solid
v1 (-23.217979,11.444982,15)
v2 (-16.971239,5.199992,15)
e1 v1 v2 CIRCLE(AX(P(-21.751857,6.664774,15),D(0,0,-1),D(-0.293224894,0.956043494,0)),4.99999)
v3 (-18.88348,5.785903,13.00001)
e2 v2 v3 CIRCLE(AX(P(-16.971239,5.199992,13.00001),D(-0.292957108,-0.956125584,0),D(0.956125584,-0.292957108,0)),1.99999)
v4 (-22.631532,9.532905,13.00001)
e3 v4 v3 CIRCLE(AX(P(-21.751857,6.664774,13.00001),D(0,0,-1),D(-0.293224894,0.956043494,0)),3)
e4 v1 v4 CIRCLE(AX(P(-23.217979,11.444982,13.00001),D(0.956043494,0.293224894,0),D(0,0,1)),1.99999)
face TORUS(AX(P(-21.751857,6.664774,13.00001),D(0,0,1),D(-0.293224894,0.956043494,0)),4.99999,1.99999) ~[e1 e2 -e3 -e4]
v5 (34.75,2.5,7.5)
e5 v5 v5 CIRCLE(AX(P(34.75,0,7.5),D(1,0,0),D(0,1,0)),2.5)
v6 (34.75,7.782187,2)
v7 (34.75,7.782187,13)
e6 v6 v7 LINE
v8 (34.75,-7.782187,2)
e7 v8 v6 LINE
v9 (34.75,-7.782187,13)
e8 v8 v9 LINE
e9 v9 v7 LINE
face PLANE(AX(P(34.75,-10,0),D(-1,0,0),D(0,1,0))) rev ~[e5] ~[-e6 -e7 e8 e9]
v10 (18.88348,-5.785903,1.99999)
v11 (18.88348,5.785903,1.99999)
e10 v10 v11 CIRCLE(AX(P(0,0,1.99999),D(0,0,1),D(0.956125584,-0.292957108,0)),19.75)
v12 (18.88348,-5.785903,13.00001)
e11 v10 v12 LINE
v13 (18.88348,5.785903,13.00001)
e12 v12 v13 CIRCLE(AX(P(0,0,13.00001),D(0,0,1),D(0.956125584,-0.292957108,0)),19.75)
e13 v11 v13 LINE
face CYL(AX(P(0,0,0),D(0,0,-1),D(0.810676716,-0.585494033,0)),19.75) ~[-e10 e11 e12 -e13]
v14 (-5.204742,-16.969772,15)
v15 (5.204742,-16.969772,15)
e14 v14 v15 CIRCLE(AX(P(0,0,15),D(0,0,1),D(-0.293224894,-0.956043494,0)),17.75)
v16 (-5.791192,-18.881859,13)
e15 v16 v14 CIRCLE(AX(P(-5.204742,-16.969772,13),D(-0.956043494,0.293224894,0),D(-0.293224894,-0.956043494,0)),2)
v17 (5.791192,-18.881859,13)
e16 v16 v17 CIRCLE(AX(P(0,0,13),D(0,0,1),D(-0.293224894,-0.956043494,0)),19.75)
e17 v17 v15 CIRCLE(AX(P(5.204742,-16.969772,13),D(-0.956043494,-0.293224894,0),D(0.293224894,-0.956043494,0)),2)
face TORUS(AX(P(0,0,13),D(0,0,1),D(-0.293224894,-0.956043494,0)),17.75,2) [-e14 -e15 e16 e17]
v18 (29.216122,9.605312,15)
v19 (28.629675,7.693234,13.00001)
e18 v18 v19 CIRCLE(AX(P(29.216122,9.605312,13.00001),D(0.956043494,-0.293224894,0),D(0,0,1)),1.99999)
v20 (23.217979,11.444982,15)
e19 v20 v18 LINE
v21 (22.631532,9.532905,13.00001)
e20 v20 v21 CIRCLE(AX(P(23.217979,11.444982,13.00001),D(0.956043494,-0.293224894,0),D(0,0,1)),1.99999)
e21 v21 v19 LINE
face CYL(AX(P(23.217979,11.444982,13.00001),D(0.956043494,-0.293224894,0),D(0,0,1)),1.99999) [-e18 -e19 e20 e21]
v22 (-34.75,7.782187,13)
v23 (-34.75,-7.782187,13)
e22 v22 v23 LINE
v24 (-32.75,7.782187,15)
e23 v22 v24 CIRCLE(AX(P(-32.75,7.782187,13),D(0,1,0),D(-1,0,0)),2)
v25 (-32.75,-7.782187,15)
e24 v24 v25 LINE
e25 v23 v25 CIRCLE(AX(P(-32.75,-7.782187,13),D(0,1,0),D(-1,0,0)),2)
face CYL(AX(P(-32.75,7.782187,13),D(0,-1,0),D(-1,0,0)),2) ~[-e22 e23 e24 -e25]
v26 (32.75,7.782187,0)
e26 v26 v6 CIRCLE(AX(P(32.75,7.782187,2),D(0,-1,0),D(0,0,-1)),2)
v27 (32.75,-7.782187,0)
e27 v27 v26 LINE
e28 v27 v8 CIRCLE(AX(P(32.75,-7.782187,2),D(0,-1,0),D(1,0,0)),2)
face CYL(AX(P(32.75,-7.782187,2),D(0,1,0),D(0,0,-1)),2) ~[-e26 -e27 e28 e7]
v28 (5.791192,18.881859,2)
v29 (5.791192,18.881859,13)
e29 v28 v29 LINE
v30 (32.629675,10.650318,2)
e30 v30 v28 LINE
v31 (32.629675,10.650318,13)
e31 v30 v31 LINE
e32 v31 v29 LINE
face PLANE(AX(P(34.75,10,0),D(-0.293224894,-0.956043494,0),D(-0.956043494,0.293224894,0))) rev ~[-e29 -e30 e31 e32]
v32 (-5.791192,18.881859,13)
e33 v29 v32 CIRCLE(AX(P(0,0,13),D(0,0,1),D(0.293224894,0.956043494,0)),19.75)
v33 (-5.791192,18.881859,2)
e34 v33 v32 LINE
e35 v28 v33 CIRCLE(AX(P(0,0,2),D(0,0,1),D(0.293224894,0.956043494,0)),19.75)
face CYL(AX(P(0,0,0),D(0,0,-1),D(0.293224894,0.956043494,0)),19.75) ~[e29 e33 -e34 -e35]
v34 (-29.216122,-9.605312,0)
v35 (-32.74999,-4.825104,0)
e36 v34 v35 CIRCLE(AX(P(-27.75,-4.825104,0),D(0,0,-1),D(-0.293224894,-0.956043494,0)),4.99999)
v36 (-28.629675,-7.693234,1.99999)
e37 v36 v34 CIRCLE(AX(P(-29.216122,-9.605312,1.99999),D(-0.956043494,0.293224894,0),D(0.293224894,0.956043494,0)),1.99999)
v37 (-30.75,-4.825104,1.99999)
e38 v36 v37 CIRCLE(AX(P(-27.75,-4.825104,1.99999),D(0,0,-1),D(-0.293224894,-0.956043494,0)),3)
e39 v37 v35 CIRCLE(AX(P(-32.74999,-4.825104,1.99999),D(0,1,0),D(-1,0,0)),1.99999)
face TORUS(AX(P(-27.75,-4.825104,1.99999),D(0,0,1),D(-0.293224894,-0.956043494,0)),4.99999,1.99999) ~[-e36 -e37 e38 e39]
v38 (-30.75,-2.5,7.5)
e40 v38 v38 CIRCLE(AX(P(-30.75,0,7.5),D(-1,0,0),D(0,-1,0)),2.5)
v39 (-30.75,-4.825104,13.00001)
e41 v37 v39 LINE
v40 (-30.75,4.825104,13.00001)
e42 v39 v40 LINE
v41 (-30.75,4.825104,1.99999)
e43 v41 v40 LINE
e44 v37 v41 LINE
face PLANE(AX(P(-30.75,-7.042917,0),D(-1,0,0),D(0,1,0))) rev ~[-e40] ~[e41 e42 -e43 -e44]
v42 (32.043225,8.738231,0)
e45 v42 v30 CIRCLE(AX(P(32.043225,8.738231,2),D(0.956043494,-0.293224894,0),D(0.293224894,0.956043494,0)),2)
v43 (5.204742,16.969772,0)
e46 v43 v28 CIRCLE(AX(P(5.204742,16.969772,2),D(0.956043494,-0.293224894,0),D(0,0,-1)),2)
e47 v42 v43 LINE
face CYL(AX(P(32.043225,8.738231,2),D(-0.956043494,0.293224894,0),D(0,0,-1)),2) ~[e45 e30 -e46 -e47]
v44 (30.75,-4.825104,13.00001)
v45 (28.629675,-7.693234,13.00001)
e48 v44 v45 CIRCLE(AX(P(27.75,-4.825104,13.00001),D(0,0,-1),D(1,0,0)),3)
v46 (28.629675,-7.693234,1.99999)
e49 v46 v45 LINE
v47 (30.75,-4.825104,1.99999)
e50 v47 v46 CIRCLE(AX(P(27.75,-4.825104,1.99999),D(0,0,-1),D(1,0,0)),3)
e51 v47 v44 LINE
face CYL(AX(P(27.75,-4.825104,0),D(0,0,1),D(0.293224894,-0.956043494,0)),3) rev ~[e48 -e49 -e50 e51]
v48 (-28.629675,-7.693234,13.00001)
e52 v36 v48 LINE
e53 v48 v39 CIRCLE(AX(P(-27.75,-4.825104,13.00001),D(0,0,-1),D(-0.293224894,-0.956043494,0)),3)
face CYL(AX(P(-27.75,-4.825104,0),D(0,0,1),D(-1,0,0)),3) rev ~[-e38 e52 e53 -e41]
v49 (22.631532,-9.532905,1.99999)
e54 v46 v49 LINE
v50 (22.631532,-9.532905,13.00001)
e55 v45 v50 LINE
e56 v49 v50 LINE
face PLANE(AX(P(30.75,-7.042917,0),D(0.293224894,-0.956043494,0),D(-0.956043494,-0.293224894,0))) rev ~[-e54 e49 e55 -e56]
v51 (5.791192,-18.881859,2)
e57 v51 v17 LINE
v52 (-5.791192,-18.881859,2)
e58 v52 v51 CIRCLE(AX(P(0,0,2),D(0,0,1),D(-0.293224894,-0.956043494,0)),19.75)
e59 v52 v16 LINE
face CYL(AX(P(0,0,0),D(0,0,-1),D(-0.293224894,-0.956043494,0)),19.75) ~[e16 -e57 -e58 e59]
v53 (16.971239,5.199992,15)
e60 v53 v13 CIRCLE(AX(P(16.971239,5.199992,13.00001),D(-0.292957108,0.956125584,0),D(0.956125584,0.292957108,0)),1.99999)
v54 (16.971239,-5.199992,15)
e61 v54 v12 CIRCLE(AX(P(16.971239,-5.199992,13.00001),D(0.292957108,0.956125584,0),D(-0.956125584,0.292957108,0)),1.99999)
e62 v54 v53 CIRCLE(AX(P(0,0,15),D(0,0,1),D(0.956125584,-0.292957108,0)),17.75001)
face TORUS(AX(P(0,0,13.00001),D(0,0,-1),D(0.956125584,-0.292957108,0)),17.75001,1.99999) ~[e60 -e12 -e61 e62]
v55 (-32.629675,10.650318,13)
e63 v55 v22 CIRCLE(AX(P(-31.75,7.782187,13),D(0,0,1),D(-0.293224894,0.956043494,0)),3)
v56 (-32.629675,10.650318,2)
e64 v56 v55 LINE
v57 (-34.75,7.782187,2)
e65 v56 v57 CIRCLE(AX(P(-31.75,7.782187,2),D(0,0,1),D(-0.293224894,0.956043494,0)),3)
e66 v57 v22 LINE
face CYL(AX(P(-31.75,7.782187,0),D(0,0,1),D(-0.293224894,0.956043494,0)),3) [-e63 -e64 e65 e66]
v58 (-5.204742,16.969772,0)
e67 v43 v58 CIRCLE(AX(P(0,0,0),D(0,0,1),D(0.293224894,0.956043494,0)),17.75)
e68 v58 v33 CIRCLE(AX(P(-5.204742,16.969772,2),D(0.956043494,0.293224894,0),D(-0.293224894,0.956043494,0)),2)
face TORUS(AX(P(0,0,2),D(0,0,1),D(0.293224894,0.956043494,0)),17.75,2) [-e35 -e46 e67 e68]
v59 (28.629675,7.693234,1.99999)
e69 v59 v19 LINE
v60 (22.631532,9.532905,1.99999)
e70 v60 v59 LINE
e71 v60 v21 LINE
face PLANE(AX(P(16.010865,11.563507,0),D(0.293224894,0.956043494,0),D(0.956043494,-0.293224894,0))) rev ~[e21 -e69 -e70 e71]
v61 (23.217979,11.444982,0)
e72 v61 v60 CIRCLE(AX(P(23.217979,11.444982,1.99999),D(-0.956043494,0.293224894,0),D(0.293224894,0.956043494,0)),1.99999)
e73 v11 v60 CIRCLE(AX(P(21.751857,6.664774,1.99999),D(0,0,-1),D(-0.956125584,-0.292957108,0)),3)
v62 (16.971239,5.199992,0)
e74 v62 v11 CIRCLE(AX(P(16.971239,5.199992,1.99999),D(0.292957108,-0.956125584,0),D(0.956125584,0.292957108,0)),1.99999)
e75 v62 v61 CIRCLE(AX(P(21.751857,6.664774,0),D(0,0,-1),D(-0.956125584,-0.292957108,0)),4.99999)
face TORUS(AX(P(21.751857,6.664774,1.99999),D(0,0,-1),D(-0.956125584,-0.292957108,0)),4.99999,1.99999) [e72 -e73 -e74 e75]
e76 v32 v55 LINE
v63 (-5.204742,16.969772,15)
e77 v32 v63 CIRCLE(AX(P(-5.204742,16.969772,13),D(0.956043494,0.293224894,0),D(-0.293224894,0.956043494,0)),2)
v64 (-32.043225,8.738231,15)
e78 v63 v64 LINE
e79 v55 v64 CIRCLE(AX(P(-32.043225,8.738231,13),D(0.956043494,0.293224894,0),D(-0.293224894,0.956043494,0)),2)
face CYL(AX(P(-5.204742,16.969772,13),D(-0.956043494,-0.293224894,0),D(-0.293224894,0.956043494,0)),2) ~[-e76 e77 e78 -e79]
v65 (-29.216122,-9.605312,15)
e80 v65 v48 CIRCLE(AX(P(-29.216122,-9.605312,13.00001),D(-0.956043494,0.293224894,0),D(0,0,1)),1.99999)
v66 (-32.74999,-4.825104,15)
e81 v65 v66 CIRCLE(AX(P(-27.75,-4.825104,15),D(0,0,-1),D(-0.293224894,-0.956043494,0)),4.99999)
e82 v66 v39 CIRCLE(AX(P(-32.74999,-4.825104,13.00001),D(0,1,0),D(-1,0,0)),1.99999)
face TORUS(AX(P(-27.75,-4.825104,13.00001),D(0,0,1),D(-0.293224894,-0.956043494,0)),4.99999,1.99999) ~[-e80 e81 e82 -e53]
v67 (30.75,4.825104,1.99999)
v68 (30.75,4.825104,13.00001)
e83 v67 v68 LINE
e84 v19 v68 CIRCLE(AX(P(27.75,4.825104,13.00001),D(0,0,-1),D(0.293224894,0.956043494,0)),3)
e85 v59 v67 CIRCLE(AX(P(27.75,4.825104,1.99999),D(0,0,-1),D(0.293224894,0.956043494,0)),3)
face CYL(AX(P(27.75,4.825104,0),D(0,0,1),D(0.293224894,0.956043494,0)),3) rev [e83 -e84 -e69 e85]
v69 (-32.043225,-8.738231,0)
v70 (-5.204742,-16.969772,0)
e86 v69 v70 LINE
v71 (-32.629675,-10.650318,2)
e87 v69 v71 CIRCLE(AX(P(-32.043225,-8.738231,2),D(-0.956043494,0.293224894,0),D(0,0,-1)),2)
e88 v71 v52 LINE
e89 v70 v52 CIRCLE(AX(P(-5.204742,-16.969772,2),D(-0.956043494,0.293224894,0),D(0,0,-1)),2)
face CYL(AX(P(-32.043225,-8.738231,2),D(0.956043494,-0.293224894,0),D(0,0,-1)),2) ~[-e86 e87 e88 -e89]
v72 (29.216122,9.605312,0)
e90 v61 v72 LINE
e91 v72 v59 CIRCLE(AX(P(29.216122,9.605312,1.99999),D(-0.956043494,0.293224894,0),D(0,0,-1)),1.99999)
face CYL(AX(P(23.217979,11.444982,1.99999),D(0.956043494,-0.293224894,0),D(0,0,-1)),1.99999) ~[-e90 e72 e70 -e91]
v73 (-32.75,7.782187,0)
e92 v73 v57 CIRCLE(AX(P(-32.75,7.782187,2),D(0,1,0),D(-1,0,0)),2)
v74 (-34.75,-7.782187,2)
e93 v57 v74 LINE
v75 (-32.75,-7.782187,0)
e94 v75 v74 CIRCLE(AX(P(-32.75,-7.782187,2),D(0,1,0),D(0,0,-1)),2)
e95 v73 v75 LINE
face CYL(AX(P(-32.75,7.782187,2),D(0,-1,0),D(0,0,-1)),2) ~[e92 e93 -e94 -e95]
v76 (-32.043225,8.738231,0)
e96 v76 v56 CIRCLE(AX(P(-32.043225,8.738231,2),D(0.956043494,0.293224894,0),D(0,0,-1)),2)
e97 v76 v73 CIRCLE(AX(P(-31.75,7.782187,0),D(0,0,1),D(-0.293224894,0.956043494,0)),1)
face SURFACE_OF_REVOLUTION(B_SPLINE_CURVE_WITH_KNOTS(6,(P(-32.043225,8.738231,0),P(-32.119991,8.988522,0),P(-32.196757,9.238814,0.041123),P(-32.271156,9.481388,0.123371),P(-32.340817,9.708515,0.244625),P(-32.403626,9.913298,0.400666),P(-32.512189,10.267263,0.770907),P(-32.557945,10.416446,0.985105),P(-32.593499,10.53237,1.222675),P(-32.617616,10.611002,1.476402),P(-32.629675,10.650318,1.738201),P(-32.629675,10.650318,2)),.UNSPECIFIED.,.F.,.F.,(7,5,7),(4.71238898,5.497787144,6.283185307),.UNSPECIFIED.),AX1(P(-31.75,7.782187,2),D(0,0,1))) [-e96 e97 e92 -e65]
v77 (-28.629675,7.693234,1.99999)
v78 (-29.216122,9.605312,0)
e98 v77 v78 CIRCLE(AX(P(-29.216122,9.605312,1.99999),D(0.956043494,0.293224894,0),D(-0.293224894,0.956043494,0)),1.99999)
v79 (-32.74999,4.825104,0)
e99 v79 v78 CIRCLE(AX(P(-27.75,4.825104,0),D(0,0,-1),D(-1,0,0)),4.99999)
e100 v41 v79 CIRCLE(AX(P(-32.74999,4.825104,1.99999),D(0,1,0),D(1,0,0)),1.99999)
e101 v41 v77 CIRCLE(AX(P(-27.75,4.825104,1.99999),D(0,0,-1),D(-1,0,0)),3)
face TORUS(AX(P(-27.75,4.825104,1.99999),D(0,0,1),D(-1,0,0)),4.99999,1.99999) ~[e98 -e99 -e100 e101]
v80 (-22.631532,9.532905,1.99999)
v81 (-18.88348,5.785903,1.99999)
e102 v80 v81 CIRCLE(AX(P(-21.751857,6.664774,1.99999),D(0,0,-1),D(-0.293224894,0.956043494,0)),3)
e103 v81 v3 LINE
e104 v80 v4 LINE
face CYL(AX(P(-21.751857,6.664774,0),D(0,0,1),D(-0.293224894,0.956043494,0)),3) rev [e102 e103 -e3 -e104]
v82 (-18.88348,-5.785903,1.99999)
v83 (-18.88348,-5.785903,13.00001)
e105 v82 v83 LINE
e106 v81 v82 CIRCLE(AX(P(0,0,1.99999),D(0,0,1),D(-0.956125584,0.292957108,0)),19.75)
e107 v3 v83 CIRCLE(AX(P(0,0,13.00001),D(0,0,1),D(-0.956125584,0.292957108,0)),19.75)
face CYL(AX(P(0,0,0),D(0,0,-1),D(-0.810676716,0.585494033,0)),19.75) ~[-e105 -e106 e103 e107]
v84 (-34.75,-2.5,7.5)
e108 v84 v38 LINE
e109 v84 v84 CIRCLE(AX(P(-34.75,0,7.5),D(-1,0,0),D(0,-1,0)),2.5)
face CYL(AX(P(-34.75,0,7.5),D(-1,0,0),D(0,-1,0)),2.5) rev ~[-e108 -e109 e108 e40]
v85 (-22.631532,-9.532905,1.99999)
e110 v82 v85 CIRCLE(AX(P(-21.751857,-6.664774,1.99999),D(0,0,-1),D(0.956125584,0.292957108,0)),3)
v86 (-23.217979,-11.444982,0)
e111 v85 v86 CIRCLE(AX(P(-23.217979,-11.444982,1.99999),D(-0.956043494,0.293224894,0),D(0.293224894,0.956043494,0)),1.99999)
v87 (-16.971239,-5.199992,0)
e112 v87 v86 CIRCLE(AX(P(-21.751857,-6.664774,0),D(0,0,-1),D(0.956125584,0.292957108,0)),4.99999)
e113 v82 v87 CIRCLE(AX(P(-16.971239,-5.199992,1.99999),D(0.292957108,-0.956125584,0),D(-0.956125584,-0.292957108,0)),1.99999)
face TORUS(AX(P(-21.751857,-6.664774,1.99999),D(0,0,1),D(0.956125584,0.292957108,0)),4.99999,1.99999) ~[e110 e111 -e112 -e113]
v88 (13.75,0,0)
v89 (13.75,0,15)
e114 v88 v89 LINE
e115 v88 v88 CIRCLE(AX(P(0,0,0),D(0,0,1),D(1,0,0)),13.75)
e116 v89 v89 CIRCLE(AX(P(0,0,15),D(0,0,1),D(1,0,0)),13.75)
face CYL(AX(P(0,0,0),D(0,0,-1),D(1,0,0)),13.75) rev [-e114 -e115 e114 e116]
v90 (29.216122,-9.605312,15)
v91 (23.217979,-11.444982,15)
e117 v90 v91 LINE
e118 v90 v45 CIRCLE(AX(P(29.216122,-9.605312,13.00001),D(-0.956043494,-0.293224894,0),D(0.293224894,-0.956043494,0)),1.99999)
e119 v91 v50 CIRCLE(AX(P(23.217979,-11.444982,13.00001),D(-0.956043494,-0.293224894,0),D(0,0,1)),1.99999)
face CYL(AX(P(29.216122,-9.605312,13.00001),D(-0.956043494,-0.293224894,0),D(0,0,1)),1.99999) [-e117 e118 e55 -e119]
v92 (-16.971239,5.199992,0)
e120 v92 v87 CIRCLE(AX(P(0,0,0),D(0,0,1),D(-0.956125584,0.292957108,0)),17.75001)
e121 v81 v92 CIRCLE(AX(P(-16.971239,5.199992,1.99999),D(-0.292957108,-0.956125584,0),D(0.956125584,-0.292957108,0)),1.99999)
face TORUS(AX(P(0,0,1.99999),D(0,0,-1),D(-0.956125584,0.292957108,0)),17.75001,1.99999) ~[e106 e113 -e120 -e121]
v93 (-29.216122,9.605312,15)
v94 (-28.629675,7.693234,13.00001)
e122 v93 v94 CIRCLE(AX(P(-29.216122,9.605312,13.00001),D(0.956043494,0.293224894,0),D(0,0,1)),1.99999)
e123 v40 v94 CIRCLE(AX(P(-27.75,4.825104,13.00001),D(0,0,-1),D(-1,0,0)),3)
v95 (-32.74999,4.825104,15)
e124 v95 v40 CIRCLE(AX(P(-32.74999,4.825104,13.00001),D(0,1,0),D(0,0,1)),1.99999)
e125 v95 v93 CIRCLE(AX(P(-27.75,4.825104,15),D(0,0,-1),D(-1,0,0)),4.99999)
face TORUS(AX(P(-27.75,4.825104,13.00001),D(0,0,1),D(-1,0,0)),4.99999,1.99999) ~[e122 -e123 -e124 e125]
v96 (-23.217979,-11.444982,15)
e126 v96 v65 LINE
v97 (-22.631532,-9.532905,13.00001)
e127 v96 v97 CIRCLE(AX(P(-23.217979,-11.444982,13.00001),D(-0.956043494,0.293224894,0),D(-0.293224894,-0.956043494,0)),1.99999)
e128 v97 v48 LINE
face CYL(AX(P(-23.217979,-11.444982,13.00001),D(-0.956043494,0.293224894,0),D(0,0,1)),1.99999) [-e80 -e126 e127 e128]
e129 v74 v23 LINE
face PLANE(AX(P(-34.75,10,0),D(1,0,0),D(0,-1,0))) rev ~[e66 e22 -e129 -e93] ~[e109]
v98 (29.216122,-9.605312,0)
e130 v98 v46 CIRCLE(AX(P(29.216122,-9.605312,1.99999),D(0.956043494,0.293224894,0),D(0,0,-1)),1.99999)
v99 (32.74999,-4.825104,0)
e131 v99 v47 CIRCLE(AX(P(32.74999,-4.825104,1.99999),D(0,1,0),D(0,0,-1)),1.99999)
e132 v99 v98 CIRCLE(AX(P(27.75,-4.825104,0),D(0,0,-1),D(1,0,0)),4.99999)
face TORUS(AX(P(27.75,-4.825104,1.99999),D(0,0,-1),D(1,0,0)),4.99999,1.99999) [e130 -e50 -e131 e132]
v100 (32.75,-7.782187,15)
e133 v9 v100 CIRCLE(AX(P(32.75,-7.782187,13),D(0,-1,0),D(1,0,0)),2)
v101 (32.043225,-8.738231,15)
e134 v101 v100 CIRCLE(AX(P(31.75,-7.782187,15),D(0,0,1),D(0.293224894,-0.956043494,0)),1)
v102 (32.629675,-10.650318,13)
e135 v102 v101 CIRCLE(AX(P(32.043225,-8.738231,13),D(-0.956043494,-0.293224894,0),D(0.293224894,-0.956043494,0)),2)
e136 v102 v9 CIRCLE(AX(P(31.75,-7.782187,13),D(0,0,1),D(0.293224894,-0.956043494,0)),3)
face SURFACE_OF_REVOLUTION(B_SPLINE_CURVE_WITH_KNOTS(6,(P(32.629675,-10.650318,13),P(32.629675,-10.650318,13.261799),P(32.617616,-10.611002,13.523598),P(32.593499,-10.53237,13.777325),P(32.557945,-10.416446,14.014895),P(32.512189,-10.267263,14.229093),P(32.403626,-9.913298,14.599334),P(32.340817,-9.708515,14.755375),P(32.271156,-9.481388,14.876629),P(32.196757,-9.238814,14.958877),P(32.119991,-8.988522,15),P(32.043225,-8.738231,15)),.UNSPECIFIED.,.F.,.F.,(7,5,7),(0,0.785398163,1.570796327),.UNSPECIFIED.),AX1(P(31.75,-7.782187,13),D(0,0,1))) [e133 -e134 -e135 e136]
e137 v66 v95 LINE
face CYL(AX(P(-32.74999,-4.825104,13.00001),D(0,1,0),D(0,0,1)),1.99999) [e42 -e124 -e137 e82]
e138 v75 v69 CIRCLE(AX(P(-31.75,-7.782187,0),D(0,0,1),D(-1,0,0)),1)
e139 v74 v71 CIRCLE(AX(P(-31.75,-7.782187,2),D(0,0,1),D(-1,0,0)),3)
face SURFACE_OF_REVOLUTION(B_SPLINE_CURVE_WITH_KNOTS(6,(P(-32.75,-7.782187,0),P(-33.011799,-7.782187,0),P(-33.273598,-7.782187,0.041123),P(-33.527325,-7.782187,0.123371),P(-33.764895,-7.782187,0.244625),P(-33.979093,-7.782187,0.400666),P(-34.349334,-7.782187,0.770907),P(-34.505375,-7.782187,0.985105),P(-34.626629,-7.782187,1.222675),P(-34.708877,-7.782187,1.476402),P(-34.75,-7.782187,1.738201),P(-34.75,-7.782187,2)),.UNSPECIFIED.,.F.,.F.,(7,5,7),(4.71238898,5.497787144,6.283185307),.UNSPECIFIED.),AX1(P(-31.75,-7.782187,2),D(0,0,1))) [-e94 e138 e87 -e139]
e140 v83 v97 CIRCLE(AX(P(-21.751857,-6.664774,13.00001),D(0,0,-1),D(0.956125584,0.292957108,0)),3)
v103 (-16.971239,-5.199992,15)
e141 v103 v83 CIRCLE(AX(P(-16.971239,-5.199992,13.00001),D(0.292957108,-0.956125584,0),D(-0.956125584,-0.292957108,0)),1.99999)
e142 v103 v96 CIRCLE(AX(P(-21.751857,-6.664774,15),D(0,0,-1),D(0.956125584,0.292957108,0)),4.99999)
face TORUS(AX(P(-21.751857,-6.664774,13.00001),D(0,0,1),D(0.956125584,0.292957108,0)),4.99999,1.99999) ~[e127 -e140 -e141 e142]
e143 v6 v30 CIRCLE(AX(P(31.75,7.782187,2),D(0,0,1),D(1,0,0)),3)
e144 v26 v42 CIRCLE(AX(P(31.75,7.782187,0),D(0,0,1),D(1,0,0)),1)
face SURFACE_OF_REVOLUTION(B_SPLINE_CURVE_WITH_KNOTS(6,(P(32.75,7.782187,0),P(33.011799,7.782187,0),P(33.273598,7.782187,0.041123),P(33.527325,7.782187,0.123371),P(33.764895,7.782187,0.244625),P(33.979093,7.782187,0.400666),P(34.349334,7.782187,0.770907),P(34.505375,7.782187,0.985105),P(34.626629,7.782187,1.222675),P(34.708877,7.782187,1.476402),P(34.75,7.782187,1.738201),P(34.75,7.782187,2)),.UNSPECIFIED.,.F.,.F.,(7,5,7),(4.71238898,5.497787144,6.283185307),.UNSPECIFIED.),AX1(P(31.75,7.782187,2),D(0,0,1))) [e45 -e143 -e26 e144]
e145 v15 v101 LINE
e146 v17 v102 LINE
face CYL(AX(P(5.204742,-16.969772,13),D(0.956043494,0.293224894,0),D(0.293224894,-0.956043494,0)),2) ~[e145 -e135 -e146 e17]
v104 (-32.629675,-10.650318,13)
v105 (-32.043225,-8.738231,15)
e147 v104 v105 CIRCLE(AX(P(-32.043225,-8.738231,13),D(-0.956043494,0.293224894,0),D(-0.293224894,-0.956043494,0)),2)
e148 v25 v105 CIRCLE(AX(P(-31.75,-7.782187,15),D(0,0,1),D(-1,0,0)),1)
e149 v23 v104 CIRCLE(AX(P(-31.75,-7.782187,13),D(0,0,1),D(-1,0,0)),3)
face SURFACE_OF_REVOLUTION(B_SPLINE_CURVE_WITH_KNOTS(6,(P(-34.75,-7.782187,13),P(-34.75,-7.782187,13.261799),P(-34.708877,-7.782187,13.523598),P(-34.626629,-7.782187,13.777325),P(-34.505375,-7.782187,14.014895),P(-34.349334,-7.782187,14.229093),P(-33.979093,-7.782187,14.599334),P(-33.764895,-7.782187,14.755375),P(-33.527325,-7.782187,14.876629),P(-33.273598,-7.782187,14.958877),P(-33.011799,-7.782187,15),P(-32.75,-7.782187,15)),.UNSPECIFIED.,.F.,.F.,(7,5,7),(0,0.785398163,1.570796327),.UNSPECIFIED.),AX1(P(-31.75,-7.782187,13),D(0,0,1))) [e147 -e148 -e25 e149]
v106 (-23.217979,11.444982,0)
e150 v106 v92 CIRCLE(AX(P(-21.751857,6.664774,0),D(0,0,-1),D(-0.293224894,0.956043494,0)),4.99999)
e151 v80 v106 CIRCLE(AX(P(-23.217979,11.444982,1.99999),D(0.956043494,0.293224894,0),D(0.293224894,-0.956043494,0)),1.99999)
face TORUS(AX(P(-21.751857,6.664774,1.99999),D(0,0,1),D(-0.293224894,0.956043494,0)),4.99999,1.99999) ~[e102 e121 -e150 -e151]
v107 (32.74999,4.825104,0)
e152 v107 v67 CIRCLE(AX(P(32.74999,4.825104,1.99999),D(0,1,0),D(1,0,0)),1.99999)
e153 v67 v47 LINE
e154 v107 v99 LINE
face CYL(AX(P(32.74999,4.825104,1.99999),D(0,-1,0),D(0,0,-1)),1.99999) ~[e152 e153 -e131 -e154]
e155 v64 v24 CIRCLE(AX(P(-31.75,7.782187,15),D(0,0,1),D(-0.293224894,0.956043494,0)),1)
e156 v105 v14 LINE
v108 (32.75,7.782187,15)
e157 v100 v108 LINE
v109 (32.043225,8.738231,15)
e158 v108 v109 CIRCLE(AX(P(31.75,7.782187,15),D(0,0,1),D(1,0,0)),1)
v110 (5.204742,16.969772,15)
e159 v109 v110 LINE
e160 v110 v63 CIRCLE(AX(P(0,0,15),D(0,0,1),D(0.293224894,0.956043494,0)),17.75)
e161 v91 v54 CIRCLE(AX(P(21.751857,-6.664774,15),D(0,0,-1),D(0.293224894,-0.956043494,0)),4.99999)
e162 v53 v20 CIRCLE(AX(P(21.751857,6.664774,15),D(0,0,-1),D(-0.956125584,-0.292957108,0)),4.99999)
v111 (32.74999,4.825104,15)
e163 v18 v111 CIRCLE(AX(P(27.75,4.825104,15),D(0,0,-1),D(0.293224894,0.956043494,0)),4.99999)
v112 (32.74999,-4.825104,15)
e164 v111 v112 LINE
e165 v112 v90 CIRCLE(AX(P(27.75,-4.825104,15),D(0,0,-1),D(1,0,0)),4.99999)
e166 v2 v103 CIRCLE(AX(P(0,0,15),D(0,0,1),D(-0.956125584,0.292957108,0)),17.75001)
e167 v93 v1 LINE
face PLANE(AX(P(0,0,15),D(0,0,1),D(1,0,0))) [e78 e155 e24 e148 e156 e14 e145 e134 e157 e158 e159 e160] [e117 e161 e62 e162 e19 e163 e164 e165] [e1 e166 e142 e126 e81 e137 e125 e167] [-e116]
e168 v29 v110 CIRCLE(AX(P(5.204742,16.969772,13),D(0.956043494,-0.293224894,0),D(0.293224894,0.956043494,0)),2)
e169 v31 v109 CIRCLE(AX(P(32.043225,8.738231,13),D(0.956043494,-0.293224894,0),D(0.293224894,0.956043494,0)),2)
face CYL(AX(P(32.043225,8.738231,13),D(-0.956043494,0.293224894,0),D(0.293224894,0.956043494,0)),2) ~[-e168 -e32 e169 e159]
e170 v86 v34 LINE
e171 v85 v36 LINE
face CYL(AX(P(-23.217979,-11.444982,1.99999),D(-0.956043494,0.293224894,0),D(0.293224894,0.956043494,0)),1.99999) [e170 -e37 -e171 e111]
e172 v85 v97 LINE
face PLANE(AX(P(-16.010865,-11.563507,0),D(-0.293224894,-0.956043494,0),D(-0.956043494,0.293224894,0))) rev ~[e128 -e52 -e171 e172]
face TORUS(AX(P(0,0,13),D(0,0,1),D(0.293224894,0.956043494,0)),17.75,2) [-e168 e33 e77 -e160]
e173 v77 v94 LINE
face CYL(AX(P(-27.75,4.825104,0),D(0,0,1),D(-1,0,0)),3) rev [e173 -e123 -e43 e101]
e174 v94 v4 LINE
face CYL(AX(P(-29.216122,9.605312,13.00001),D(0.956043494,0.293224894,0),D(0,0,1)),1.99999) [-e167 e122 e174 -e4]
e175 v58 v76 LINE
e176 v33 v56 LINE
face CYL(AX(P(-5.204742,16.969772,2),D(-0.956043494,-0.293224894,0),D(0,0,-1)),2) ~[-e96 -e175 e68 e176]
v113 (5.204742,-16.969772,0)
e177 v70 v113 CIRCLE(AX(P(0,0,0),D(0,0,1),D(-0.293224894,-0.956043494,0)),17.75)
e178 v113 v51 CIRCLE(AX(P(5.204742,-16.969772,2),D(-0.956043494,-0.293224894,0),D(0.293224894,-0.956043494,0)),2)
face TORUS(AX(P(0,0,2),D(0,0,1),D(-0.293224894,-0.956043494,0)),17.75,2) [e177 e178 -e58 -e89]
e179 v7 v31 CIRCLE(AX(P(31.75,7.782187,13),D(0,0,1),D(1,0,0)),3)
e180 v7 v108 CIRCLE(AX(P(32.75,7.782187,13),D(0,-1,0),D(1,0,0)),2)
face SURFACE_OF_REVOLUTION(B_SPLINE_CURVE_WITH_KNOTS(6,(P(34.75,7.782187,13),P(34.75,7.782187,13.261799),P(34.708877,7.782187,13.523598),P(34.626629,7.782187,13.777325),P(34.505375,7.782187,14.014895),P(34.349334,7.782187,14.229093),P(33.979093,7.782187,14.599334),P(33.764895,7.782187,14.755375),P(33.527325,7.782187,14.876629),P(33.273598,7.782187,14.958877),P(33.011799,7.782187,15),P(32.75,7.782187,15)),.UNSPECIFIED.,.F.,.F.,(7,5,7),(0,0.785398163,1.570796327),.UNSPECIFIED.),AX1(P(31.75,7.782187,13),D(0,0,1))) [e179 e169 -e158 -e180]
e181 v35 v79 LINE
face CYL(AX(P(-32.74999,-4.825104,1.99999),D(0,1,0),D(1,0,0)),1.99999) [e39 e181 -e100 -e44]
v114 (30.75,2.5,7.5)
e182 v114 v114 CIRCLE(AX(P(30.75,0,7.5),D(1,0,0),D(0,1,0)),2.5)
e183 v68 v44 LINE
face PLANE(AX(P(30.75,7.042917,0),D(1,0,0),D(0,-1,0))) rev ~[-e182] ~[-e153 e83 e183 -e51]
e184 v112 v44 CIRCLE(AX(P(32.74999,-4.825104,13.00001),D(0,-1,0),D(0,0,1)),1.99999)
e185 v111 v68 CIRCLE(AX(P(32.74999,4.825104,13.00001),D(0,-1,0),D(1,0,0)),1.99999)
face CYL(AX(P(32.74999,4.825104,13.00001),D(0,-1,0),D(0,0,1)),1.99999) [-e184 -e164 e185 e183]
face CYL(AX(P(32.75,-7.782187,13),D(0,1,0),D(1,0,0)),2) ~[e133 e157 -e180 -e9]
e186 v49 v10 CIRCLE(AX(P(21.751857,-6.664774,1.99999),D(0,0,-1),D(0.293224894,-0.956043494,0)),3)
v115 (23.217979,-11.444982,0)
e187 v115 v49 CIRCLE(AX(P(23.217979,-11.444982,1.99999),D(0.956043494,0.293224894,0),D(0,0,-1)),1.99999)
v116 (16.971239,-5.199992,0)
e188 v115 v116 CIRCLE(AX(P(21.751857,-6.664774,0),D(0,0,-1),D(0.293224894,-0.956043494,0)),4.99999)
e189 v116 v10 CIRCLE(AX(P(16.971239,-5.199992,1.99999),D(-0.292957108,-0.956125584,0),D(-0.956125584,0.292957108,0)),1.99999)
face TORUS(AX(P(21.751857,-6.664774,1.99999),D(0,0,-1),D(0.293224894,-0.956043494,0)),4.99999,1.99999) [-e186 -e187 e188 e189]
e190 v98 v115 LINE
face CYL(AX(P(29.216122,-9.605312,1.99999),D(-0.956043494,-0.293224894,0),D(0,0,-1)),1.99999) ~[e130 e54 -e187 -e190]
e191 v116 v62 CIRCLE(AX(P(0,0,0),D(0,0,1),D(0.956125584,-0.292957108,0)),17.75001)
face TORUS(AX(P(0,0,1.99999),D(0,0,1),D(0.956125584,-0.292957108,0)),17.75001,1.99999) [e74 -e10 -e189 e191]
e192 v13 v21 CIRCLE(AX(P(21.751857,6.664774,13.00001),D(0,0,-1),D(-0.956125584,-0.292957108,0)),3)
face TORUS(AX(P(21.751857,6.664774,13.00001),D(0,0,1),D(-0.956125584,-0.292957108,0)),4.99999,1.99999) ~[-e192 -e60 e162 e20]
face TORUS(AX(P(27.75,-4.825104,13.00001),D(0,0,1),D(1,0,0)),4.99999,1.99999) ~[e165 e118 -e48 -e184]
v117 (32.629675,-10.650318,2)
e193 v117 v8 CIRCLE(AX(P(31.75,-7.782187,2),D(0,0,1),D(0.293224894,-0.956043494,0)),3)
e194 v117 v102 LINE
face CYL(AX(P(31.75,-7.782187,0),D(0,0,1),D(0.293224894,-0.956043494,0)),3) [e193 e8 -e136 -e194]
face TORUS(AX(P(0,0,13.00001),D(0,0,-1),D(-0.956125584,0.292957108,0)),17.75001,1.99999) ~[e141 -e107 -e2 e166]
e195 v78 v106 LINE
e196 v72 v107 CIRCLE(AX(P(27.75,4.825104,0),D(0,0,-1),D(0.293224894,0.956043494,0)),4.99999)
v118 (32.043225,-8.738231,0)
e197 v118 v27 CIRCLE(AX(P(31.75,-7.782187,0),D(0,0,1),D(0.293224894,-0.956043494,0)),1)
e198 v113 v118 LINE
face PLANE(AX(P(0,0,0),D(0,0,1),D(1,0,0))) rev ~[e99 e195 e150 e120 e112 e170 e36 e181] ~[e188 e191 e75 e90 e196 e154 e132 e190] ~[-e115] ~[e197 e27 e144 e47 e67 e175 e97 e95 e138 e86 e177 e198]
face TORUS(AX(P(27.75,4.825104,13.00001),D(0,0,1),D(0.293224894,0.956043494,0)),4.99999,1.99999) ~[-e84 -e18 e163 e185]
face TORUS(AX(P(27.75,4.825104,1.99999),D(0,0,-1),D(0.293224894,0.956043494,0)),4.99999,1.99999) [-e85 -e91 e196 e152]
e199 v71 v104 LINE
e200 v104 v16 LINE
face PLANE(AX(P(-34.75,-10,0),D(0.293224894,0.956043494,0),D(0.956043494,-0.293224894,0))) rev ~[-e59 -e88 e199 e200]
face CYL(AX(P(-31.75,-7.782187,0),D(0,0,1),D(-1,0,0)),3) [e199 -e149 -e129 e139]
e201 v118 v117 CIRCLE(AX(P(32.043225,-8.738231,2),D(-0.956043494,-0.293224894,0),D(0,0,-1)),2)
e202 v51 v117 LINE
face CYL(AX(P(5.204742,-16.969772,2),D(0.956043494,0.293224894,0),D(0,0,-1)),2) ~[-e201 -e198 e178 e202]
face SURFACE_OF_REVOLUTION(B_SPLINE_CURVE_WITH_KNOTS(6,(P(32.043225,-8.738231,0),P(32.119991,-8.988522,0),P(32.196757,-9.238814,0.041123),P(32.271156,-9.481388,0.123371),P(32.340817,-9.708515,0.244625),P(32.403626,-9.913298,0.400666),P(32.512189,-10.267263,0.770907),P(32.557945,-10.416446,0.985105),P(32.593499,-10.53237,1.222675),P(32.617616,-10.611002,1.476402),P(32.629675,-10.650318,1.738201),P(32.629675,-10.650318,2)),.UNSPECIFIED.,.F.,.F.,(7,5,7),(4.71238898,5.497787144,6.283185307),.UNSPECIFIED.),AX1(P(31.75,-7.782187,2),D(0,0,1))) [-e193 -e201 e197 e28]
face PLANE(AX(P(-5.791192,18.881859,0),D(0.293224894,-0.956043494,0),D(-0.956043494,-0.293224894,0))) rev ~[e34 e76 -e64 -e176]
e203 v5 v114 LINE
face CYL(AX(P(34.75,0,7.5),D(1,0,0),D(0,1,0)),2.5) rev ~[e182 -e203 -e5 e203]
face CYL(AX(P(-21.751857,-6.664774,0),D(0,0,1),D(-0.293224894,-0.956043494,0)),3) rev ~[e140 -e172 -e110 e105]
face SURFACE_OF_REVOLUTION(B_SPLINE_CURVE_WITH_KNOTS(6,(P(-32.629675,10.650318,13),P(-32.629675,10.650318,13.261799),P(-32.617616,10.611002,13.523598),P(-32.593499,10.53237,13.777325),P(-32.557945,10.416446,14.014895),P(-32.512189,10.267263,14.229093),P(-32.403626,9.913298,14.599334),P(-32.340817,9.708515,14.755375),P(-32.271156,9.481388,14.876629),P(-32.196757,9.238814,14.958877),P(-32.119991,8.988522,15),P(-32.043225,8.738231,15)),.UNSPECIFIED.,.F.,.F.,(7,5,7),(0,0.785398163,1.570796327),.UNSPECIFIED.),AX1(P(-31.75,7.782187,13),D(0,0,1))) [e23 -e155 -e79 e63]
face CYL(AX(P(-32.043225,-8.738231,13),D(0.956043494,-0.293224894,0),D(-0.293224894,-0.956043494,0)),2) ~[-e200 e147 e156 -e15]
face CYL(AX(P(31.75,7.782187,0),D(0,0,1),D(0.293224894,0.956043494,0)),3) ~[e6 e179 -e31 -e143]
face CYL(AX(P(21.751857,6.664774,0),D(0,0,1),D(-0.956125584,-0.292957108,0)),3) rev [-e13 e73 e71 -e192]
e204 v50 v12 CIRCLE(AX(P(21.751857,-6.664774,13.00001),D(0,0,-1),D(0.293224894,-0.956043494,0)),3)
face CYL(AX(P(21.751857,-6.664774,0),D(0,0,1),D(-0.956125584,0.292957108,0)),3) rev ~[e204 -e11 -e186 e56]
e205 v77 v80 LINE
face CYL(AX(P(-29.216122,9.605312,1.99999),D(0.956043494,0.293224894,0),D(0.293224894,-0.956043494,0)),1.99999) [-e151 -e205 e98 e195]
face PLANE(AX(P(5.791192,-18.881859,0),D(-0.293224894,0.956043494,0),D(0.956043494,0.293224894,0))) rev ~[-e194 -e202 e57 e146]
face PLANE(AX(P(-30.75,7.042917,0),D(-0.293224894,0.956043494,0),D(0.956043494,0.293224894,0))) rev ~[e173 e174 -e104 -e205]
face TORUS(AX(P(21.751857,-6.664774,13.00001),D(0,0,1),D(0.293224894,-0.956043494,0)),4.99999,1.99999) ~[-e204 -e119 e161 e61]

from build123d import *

# Parameters (mm, degrees)
F0_R      = 13.75
F1_DEPTH  = 15
F2_R      = 3
F3_R      = 3
F4_R      = 3
F5_R      = 3
F6_R      = 2
F7_R      = 2
F8_R      = 1.99999
F9_R      = 1.99999
F10_R     = 1.99999
F11_R     = 1.99999
F12_R     = 2.5
F13_DEPTH = 5
F14_R     = 2.5
F15_DEPTH = 5


# Not quite as in the source:
# - a fillet or chamfer is up to 0.001 mm smaller than in the source, because OpenCascade refuses the exact size


with BuildPart() as f1:
    # F0 (on Top) → F1 (new body)
    with BuildSketch(Plane.XY):
        with BuildLine():
            Line((-34.75, 10), (-34.75, -10))
            Line((-34.75, -10), (-5.7911916553, -18.8818589978))
            ThreePointArc((-5.7911916553, -18.8818589978), (0, -19.75), (5.7911916553, -18.8818589978))
            Line((5.7911916553, -18.8818589978), (34.75, -10))
            Line((34.75, -10), (34.75, 10))
            Line((34.75, 10), (5.7911916553, 18.8818589978))
            ThreePointArc((5.7911916553, 18.8818589978), (0, 19.75), (-5.7911916553, 18.8818589978))
            Line((-5.7911916553, 18.8818589978), (-34.75, 10))
        make_face()
        with BuildLine():
            Line((16.0108651403, 11.5635071436), (30.75, 7.0429165166))
            Line((30.75, 7.0429165166), (30.75, -7.0429165166))
            Line((30.75, -7.0429165166), (16.0108651403, -11.5635071436))
            ThreePointArc((16.0108651403, -11.5635071436), (19.75, 0), (16.0108651403, 11.5635071436))
        make_face(mode=Mode.SUBTRACT)
        with BuildLine():
            Line((-30.75, 7.0429165166), (-16.0108651403, 11.5635071436))
            ThreePointArc((-16.0108651403, 11.5635071436), (-19.75, 0), (-16.0108651403, -11.5635071436))
            Line((-16.0108651403, -11.5635071436), (-30.75, -7.0429165166))
            Line((-30.75, -7.0429165166), (-30.75, 7.0429165166))
        make_face(mode=Mode.SUBTRACT)
        Circle(F0_R, mode=Mode.SUBTRACT)
    extrude(amount=F1_DEPTH)

    # F2
    f2_edges = [f1.edges().sort_by_distance(p)[0] for p in [
        (-30.75, 7.042917, 7.5),
        (-30.75, -7.042917, 7.5),
        (-16.010865, 11.563507, 7.5),
        (-16.010865, -11.563507, 7.5),
    ]]
    fillet(f2_edges, radius=F2_R)

    # F3
    f3_edges = [f1.edges().sort_by_distance(p)[0] for p in [
        (16.010865, 11.563507, 7.5),
        (30.75, 7.042917, 7.5),
        (30.75, -7.042917, 7.5),
        (16.010865, -11.563507, 7.5),
    ]]
    fillet(f3_edges, radius=F3_R)

    # F4
    f4_edges = [f1.edges().sort_by_distance(p)[0] for p in [
        (34.75, -10, 7.5),
        (34.75, 10, 7.5),
    ]]
    fillet(f4_edges, radius=F4_R)

    # F5
    f5_edges = [f1.edges().sort_by_distance(p)[0] for p in [
        (-34.75, 10, 7.5),
        (-34.75, -10, 7.5),
    ]]
    fillet(f5_edges, radius=F5_R)

    # F6
    f6_edges = [f1.edges().sort_by_distance(p)[0] for p in [
        (-19.210433, 14.766088, 15),
    ]]
    fillet(f6_edges, radius=F6_R)

    # F7
    f7_edges = [f1.edges().sort_by_distance(p)[0] for p in [
        (-19.210433, -14.766088, 0),
    ]]
    fillet(f7_edges, radius=F7_R)

    # F8 (radius 2 in the source; OpenCascade refuses exactly that, so slightly less here)
    f8_edges = [f1.edges().sort_by_distance(p)[0] for p in [
        (-25.630603, 8.61307, 15),
    ]]
    fillet(f8_edges, radius=F8_R)

    # F9 (radius 2 in the source; OpenCascade refuses exactly that, so slightly less here)
    f9_edges = [f1.edges().sort_by_distance(p)[0] for p in [
        (25.630603, 8.61307, 15),
    ]]
    fillet(f9_edges, radius=F9_R)

    # F10 (radius 2 in the source; OpenCascade refuses exactly that, so slightly less here)
    f10_edges = [f1.edges().sort_by_distance(p)[0] for p in [
        (-25.630603, -8.61307, 0),
    ]]
    fillet(f10_edges, radius=F10_R)

    # F11 (radius 2 in the source; OpenCascade refuses exactly that, so slightly less here)
    f11_edges = [f1.edges().sort_by_distance(p)[0] for p in [
        (25.630603, -8.61307, 0),
    ]]
    fillet(f11_edges, radius=F11_R)

    # F12 (on face) → F13 (cut)
    with BuildSketch(Plane(origin=(-34.75, 0, 0), x_dir=(0, -1, 0), z_dir=(-1, 0, 0))):
        with Locations((0, 7.5)):
            Circle(F12_R)
    extrude(amount=-F13_DEPTH, mode=Mode.SUBTRACT)

    # F14 (on face) → F15 (cut)
    with BuildSketch(Plane.YZ.offset(34.75)):
        with Locations((0, 7.5)):
            Circle(F14_R)
    extrude(amount=-F15_DEPTH, mode=Mode.SUBTRACT)


solid = f1.part
